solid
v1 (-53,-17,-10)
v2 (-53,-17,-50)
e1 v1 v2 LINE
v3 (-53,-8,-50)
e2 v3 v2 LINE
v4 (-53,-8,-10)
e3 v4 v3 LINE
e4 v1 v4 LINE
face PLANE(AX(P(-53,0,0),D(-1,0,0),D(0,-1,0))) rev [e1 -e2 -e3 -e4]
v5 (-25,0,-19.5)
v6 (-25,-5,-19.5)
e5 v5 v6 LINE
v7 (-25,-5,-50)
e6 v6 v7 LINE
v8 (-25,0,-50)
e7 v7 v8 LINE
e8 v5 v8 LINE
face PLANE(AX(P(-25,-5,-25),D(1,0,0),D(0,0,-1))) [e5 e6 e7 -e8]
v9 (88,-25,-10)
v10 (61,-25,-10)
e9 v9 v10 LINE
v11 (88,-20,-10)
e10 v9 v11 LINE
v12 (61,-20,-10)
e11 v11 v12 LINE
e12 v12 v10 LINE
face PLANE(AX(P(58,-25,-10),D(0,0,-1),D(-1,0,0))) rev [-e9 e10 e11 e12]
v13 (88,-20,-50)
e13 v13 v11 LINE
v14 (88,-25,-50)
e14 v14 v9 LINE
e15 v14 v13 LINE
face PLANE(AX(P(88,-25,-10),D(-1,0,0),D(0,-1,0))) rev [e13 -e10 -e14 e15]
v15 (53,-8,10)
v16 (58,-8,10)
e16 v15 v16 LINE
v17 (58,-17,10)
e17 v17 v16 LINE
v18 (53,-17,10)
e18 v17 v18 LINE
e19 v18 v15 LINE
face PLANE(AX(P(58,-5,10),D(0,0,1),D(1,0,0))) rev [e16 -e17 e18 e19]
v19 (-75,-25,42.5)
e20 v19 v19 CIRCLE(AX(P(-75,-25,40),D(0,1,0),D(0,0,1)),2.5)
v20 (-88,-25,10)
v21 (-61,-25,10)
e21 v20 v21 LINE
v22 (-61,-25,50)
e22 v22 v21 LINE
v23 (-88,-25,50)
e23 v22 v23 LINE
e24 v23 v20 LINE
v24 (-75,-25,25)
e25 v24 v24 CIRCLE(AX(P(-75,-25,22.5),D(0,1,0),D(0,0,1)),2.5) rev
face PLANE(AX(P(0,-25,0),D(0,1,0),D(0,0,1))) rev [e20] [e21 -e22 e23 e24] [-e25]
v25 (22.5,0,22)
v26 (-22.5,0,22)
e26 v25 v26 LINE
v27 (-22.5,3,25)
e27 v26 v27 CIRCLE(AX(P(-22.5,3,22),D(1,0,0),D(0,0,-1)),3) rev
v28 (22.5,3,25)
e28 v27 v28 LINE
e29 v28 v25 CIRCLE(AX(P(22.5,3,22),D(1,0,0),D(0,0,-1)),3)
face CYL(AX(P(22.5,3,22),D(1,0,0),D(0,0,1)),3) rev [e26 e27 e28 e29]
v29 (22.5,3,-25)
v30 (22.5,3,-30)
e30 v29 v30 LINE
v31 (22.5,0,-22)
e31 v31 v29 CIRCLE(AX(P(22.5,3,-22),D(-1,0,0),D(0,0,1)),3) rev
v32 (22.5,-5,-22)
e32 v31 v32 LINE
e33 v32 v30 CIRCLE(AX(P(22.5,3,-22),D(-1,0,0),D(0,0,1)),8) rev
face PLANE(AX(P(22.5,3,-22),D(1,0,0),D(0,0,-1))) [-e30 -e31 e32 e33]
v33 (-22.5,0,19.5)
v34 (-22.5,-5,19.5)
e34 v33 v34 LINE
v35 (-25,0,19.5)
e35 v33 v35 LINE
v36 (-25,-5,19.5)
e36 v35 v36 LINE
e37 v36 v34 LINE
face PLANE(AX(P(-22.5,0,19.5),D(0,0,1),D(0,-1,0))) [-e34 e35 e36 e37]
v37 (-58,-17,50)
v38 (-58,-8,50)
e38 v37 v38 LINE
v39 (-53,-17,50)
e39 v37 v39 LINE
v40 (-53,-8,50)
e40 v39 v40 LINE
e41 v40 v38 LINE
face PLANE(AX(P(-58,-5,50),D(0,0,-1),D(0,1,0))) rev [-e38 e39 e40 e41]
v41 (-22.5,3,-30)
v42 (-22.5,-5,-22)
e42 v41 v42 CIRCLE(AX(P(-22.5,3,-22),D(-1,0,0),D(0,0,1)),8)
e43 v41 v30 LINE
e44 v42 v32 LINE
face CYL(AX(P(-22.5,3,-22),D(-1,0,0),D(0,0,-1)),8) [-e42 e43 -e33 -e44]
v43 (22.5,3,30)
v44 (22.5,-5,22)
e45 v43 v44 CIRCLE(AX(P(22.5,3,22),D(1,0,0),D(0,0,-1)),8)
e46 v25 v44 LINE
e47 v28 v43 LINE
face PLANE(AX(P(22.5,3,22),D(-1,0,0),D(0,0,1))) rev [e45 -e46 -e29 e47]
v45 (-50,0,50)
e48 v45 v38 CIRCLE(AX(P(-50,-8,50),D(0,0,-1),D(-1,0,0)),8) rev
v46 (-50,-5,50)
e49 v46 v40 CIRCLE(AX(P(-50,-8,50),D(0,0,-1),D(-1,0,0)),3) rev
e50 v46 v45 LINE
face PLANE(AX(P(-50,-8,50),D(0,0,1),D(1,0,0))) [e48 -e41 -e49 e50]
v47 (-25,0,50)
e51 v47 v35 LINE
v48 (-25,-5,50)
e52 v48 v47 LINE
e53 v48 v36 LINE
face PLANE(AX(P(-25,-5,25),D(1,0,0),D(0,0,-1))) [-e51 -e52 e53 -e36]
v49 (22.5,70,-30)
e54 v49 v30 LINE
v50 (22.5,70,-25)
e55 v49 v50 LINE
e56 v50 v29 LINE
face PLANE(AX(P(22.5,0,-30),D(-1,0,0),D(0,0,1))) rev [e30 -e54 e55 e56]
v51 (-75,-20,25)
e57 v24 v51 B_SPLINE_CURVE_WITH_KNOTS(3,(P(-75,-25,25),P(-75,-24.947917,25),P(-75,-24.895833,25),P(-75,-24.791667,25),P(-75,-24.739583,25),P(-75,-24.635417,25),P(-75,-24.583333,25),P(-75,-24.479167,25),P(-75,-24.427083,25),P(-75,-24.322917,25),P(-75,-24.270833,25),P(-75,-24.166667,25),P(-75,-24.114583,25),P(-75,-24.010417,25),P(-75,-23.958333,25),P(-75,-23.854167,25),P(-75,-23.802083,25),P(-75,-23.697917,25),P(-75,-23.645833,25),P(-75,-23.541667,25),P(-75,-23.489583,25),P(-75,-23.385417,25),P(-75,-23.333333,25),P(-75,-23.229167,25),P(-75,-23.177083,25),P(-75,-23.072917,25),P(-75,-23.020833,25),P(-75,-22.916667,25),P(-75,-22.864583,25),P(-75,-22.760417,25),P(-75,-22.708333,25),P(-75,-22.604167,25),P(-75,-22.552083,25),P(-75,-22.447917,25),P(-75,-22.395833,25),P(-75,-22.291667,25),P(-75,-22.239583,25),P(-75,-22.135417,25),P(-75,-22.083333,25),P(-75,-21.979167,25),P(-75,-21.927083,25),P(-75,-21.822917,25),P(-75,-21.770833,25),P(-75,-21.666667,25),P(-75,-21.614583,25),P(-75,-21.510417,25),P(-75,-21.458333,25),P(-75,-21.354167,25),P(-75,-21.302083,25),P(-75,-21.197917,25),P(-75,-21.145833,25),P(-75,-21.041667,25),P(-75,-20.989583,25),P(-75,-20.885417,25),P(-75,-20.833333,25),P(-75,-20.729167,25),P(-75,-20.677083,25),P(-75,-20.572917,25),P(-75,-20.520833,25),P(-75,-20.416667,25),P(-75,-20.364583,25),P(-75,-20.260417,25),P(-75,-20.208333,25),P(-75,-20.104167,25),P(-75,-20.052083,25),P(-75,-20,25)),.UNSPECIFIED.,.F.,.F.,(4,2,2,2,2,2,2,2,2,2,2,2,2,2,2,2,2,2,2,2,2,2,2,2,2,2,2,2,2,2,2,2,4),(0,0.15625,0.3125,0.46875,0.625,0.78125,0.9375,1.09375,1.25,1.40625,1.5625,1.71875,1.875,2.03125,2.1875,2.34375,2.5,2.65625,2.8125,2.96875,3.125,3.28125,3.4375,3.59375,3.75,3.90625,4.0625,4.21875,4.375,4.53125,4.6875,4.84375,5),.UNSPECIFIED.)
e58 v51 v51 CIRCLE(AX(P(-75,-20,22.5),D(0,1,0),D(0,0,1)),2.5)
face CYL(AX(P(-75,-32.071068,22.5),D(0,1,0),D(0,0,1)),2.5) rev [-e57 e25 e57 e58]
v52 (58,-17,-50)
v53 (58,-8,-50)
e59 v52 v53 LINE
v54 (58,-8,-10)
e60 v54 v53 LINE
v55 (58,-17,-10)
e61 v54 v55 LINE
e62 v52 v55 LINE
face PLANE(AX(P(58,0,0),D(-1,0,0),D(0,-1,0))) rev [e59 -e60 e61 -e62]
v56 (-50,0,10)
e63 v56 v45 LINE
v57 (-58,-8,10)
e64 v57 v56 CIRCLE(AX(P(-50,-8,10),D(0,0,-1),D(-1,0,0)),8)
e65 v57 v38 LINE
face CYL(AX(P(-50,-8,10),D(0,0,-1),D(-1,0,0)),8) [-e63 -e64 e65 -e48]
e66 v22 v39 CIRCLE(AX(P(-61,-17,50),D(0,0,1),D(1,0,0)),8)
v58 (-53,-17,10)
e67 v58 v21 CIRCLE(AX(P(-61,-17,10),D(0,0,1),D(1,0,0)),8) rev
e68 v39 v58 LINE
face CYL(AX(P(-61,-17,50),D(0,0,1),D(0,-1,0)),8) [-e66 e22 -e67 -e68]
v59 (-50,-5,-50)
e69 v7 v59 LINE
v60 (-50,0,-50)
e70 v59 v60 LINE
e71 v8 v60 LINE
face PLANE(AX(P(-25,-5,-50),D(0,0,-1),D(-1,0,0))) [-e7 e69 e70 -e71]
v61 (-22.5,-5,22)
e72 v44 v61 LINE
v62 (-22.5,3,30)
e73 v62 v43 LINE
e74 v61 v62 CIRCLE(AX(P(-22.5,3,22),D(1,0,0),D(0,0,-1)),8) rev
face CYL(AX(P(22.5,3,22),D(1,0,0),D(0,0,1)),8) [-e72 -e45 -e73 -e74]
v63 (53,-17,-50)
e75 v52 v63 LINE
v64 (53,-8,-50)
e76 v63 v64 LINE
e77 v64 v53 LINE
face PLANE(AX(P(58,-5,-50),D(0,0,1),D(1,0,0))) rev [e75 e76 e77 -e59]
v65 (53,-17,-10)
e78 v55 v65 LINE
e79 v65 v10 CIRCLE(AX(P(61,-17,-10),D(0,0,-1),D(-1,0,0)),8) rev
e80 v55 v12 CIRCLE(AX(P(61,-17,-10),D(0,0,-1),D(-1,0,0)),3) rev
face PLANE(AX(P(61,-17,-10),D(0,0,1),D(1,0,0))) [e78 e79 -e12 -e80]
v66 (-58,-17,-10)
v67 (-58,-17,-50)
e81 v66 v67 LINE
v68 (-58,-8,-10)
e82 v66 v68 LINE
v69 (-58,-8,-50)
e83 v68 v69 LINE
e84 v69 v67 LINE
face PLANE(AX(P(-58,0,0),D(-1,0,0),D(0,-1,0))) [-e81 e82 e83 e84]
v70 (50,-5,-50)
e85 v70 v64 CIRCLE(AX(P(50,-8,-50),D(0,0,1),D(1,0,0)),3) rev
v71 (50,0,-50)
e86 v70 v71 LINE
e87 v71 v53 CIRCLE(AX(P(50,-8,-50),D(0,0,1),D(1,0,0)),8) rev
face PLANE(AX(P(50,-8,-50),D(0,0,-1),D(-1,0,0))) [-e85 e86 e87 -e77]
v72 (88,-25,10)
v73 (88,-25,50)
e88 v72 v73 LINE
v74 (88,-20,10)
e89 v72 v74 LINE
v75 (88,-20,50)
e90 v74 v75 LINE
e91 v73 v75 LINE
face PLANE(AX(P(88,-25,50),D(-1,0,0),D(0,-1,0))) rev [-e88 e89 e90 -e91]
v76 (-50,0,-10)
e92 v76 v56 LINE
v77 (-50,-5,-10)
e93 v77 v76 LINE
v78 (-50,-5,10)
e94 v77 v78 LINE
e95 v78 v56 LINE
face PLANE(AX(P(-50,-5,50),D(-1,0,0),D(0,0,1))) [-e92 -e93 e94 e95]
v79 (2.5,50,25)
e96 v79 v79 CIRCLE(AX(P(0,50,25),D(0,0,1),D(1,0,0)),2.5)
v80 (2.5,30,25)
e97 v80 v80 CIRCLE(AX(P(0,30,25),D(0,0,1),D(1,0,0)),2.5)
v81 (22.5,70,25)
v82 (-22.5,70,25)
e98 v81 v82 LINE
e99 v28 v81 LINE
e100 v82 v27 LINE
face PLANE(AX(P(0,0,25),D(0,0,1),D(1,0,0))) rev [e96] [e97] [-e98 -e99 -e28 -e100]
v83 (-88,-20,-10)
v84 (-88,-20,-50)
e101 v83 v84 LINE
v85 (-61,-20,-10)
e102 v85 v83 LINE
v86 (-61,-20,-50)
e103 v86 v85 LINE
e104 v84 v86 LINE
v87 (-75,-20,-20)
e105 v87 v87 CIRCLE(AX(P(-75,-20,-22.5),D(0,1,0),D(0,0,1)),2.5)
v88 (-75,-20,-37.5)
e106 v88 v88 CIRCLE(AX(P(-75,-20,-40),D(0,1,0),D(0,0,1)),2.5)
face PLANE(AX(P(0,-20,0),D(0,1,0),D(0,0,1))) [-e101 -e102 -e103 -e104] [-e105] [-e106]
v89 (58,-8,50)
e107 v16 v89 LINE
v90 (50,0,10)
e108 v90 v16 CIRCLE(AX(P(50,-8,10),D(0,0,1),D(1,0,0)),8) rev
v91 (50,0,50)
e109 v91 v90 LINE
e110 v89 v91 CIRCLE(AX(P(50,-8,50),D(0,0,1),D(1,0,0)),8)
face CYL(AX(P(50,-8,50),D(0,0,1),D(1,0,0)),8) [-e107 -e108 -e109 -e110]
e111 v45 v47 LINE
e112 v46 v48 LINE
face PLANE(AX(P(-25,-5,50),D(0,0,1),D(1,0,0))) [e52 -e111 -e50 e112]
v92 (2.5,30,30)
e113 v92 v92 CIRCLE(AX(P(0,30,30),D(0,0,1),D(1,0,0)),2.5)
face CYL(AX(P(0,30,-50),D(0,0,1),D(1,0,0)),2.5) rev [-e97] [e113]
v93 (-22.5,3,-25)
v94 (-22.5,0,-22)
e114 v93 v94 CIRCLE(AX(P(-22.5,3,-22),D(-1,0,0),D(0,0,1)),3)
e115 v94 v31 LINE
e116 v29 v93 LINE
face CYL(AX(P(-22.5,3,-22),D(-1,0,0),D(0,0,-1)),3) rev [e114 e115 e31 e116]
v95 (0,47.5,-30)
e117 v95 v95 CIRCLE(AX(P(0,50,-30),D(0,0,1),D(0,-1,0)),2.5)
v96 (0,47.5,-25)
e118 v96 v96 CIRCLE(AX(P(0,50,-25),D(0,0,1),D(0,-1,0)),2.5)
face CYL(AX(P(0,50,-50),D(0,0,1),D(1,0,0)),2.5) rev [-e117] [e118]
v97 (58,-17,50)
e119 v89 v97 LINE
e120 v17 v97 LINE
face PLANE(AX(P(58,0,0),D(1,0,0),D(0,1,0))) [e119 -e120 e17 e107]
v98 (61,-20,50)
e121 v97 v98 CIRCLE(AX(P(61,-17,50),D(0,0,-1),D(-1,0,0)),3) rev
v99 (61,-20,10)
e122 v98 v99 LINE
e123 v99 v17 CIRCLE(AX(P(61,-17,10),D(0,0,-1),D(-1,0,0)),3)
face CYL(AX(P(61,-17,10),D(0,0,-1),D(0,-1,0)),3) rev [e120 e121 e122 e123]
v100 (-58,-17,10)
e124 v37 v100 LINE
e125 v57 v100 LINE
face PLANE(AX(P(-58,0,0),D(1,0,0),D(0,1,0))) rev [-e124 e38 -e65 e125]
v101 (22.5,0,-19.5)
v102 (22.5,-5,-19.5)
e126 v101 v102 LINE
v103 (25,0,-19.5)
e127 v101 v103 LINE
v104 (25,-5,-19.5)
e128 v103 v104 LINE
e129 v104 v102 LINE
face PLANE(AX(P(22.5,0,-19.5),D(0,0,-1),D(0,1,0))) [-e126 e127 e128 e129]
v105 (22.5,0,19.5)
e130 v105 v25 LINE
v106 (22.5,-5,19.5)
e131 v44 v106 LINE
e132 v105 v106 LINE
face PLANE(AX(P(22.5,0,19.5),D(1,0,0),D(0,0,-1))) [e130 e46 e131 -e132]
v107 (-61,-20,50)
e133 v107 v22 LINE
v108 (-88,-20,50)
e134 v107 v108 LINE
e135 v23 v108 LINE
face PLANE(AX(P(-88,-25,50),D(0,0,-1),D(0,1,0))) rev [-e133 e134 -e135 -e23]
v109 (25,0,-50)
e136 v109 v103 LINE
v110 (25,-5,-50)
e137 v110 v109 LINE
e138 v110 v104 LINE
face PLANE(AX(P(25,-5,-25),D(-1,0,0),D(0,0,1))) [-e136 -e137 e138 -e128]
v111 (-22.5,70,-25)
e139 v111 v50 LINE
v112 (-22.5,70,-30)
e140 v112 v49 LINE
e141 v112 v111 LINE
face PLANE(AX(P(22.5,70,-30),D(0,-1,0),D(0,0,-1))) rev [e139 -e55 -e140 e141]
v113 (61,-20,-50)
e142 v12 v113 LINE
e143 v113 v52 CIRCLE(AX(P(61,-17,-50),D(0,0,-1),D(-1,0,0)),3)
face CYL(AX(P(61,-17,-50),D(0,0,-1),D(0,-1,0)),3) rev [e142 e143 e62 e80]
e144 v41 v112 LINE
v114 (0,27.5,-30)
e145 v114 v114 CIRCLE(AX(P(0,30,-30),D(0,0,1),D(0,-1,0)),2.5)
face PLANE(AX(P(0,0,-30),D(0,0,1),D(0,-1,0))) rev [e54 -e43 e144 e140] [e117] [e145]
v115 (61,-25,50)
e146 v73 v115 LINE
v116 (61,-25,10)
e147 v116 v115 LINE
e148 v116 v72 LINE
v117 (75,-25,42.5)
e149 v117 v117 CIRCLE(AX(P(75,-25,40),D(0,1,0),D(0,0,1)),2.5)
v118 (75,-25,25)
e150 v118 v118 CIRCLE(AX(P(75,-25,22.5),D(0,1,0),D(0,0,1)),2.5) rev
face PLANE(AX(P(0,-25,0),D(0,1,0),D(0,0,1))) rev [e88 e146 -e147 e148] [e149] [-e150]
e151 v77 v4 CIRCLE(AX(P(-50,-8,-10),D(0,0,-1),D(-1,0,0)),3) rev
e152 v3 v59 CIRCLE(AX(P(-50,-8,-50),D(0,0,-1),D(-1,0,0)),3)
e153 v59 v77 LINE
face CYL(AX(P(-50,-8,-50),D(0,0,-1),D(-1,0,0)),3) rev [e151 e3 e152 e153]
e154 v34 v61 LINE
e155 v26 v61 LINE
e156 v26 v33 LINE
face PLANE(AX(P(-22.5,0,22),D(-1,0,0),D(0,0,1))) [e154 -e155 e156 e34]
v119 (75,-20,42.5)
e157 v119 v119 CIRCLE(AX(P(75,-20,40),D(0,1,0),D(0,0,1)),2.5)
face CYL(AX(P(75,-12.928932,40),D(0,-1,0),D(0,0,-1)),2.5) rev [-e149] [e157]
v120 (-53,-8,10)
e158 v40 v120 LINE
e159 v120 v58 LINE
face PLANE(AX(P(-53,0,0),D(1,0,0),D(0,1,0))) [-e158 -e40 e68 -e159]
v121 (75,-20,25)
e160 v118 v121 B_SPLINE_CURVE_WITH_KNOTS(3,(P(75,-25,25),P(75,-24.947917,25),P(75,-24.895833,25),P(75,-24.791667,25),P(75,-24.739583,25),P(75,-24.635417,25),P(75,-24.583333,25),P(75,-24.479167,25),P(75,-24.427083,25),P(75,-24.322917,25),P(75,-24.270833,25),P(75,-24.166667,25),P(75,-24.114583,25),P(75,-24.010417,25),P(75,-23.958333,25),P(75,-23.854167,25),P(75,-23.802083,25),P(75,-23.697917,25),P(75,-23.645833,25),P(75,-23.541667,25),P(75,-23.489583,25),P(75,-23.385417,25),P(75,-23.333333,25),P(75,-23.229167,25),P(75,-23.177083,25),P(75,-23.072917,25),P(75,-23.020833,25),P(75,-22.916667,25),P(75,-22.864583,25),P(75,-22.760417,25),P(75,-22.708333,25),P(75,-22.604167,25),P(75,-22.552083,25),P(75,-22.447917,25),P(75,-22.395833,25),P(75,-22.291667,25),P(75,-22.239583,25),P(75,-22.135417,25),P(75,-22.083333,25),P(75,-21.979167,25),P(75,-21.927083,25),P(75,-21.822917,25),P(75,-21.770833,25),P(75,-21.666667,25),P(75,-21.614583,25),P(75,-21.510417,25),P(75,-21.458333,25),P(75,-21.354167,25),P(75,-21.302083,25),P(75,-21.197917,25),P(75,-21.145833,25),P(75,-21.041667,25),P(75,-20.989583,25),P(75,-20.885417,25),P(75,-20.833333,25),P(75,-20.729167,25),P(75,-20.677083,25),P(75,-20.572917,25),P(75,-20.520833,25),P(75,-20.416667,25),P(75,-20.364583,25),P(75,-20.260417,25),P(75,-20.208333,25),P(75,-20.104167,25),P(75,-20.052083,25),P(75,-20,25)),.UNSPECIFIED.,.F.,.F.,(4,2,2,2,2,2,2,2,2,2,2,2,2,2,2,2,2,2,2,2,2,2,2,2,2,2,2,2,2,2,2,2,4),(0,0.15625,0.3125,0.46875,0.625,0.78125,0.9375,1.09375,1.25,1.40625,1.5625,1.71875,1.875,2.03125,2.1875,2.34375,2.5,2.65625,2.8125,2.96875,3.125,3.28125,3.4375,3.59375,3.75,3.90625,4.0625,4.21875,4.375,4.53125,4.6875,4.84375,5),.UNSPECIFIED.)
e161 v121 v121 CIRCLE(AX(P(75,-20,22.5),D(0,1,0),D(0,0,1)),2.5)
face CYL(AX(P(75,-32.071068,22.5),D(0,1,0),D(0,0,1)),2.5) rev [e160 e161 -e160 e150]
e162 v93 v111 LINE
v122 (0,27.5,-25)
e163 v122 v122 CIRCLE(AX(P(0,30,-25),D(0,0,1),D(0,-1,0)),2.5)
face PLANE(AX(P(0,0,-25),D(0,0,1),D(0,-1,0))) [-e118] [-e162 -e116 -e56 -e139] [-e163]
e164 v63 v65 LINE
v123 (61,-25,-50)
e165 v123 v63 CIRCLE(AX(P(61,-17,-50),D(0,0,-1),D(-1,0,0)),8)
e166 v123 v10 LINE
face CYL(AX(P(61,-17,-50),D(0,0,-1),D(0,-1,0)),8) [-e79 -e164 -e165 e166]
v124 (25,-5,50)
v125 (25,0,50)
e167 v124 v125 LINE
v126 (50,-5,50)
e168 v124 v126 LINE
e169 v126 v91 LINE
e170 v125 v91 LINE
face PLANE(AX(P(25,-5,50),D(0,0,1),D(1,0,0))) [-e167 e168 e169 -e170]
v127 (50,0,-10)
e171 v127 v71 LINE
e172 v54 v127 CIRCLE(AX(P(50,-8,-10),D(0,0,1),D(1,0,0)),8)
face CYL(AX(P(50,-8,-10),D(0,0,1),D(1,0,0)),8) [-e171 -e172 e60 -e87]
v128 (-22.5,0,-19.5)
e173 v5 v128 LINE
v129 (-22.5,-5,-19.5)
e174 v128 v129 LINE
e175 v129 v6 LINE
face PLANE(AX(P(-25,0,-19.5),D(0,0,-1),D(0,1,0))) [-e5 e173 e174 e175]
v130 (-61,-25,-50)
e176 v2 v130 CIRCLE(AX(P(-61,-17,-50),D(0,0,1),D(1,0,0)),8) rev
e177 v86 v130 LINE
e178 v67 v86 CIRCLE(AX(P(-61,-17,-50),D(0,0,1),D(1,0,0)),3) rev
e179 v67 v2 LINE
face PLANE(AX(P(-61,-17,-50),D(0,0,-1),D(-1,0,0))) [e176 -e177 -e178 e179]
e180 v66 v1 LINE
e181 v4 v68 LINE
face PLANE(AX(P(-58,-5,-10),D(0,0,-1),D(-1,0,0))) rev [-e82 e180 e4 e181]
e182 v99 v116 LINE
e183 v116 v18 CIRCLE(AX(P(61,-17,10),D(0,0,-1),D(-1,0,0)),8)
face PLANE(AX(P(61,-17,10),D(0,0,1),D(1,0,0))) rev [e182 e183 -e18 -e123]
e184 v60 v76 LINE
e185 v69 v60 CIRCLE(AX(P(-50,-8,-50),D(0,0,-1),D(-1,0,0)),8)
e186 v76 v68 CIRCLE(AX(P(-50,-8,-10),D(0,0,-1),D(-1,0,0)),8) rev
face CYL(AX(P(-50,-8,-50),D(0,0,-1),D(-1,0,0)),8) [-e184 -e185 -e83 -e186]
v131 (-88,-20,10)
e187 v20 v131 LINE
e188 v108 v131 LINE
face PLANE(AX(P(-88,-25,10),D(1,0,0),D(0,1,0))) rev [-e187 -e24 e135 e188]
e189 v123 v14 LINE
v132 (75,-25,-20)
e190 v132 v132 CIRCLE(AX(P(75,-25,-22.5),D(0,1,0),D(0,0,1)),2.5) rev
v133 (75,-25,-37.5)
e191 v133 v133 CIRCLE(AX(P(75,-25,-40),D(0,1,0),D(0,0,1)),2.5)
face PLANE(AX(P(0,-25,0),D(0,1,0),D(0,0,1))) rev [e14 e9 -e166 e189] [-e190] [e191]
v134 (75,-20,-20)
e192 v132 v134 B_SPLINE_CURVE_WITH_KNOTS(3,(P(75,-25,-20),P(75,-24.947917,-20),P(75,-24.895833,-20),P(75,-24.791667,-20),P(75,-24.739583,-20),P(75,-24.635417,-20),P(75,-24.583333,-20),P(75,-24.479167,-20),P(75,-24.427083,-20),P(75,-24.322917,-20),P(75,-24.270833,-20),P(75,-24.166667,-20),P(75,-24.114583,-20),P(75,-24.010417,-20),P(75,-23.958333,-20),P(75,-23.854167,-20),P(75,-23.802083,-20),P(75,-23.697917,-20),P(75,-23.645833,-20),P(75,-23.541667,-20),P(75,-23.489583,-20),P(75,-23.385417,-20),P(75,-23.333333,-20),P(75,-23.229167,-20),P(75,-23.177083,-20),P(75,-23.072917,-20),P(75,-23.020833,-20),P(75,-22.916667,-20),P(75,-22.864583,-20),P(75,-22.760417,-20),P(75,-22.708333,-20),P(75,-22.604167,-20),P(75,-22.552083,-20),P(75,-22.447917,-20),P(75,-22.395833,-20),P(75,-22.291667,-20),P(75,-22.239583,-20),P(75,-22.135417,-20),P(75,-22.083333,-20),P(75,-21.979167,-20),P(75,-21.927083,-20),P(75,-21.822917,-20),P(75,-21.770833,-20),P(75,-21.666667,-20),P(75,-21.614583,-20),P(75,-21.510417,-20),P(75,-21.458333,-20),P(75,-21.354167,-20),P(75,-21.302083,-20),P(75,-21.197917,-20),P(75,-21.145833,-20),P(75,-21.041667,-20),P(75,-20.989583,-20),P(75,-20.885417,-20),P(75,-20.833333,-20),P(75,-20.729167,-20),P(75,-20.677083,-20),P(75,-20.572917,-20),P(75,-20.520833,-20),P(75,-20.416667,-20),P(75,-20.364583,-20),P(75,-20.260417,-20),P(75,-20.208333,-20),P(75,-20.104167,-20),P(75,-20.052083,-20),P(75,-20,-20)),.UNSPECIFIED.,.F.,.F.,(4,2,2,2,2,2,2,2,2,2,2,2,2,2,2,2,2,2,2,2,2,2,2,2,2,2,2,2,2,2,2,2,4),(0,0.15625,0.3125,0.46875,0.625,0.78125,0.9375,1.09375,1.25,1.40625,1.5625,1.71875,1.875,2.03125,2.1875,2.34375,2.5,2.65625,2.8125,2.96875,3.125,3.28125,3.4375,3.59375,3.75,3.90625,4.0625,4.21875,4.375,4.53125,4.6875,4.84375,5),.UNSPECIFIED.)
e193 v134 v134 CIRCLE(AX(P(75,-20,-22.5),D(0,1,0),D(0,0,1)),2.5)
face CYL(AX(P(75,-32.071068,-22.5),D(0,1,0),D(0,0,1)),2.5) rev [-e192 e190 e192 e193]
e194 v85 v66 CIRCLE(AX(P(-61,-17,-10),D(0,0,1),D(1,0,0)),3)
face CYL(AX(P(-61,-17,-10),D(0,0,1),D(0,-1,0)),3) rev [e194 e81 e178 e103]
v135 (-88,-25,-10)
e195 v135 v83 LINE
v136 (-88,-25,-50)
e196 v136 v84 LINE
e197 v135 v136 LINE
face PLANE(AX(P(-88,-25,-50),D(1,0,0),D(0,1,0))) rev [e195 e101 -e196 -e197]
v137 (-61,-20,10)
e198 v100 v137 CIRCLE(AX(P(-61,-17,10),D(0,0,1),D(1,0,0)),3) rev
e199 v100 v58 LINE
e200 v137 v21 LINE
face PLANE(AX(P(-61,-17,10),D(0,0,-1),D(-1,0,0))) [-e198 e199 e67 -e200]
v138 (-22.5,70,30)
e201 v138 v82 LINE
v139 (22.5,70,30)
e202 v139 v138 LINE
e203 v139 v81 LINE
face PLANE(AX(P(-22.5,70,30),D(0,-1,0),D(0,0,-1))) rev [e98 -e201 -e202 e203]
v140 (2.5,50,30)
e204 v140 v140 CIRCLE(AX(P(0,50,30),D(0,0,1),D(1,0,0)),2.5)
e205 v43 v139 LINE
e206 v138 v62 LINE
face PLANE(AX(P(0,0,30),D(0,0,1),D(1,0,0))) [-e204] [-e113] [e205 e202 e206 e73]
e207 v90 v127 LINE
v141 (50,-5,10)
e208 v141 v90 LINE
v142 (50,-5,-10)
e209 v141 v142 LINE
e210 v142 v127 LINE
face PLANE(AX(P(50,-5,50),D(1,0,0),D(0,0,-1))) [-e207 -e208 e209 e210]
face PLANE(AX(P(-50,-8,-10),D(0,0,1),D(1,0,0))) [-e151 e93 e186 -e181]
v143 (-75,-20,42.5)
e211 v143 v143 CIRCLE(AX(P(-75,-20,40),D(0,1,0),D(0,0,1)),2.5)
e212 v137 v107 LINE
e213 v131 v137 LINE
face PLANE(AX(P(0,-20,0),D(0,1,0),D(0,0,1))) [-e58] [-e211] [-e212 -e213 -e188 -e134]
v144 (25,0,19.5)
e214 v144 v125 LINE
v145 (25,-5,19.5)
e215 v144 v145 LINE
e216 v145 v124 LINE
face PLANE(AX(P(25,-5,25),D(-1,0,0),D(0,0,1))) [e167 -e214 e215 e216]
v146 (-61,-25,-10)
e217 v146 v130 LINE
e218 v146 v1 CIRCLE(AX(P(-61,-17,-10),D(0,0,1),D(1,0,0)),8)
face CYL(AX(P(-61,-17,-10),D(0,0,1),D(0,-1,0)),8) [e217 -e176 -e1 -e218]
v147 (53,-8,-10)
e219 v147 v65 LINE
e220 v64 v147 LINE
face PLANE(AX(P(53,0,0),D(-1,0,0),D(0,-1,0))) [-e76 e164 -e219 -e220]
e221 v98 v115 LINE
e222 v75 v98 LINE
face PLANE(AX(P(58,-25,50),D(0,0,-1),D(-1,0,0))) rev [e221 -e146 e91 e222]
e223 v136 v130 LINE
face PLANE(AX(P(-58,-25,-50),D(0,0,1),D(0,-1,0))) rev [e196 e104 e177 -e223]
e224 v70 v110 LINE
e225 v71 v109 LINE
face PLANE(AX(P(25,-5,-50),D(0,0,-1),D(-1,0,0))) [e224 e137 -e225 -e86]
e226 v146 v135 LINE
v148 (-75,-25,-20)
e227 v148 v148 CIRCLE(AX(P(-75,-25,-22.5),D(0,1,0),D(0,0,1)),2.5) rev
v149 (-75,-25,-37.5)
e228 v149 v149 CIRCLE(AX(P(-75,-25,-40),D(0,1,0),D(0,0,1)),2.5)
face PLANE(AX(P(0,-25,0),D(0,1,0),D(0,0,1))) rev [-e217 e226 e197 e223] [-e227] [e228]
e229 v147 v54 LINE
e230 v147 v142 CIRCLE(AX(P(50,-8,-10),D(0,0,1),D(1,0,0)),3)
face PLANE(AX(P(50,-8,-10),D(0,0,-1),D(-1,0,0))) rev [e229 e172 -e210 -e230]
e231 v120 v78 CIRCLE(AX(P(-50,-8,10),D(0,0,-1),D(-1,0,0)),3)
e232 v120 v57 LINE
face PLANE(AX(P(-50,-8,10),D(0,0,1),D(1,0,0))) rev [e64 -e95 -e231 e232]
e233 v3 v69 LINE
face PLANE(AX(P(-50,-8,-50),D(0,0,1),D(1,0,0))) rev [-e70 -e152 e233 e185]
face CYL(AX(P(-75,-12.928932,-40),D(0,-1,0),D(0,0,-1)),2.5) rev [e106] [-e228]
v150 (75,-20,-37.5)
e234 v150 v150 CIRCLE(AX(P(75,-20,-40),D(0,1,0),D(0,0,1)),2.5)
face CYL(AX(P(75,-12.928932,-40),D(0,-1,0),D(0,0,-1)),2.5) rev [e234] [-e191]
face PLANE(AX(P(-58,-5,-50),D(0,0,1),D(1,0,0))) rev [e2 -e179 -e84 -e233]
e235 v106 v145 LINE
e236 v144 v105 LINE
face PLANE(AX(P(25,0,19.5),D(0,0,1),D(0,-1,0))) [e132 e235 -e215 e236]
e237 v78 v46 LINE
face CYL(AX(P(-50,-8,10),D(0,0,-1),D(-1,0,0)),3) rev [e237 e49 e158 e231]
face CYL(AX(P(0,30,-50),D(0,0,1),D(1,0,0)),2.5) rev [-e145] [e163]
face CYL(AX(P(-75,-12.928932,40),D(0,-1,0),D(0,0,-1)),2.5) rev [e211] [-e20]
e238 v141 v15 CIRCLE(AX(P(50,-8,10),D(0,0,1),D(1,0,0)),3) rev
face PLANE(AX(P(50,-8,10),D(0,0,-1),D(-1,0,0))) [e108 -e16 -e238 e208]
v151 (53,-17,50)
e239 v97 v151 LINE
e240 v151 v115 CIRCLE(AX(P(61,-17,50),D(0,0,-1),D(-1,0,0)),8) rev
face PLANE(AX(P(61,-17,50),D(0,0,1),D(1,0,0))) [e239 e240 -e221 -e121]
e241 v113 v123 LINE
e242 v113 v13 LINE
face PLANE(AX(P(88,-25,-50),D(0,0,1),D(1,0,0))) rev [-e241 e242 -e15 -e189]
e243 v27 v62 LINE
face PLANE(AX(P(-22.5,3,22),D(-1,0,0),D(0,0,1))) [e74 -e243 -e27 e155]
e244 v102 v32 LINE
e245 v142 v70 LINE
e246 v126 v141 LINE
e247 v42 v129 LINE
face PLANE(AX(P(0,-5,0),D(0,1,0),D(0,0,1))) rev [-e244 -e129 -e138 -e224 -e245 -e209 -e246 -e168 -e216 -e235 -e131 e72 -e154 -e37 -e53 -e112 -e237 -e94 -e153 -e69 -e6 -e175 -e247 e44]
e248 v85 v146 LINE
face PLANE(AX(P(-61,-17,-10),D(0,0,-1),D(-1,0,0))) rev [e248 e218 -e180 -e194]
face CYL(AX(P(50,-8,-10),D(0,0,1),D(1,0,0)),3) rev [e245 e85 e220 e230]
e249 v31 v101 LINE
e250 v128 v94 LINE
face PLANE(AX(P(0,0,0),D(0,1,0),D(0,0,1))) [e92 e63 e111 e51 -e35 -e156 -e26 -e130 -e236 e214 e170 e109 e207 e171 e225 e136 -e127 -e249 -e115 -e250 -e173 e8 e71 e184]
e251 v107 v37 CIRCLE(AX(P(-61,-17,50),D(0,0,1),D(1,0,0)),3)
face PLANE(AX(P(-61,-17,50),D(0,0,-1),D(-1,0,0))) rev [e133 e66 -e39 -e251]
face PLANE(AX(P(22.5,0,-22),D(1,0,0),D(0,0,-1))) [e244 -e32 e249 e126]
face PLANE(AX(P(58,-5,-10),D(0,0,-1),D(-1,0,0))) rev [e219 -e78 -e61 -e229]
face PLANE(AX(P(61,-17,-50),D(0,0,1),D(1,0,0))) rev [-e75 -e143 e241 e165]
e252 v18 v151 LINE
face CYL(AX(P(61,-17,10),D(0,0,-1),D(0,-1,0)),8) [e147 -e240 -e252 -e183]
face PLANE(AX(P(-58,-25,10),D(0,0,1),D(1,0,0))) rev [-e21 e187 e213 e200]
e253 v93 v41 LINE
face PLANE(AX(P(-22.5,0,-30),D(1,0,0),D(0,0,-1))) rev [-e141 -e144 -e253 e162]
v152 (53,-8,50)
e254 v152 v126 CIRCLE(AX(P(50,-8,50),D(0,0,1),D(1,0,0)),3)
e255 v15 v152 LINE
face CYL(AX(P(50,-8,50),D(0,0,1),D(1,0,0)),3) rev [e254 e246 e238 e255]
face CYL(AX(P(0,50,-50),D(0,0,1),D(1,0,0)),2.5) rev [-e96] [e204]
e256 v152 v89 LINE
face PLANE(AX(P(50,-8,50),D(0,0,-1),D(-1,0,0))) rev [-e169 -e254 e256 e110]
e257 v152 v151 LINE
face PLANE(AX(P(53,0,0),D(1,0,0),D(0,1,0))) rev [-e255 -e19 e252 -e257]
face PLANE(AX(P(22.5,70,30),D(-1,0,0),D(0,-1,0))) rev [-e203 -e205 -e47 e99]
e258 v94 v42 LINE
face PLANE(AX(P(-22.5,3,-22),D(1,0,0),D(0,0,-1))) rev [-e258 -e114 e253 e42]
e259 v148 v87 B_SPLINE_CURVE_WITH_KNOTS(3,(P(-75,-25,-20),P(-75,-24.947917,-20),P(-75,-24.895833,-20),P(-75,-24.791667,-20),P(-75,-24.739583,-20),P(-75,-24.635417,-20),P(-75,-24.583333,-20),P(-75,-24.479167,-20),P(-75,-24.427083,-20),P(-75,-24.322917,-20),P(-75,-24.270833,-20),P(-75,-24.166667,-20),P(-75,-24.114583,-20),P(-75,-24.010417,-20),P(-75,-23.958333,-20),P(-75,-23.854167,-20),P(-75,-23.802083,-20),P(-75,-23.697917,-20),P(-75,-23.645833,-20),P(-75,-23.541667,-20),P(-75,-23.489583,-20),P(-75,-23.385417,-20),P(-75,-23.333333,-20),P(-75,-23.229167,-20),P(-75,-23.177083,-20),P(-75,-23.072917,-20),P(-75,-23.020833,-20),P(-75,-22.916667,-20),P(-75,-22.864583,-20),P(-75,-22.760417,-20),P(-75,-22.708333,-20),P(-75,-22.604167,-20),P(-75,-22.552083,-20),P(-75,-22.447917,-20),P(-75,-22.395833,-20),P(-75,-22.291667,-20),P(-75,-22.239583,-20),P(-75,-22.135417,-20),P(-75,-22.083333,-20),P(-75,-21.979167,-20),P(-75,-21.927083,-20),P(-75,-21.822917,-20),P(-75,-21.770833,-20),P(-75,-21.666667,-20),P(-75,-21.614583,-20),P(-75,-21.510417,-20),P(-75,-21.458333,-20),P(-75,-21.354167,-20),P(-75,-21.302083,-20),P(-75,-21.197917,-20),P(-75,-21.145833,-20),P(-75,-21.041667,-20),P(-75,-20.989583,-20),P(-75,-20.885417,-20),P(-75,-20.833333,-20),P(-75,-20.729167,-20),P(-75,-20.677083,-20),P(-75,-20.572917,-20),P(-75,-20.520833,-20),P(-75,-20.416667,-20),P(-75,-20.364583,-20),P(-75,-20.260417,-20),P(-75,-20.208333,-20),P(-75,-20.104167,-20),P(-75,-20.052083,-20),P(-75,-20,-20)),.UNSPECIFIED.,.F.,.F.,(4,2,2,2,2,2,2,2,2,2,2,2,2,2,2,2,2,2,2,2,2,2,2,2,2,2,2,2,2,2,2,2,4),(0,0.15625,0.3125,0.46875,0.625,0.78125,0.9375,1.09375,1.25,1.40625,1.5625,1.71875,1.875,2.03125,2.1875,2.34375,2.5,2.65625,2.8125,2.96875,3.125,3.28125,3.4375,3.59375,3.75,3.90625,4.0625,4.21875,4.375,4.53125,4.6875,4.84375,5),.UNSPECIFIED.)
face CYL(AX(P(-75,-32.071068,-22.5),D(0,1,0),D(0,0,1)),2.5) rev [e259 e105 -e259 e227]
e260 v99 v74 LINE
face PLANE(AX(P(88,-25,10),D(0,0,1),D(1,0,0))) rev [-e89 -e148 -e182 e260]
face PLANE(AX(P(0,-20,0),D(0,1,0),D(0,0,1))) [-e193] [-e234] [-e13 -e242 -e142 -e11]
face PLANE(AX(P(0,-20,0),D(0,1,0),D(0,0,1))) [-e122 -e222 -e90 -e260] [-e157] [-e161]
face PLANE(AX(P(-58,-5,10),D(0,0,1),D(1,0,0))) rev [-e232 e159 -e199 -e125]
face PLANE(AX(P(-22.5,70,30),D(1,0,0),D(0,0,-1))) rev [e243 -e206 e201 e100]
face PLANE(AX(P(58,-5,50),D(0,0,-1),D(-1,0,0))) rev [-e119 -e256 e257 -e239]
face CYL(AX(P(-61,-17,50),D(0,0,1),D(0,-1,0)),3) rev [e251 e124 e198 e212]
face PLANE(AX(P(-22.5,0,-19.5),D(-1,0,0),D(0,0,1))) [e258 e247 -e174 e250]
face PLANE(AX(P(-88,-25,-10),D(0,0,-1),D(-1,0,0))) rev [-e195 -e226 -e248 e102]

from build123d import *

# Parameters (mm, degrees)
SM_BASE_FLANGE_1_DEPTH            = 5
SM_EDGE_FLANGE_1_STRIP_W          = 26
SM_EDGE_FLANGE_1_STRIP_H          = 5
SM_EDGE_FLANGE_1_STRIP_CUT_DEPTH  = 45
SM_EDGE_FLANGE_1_RELIEF_W         = 28.5
SM_EDGE_FLANGE_1_RELIEF_H         = 2.5
SM_EDGE_FLANGE_1_RELIEF_CUT_DEPTH = 5
SM_EDGE_FLANGE_1_DEPTH            = 45
SM_EDGE_FLANGE_2_STRIP_W          = 26
SM_EDGE_FLANGE_2_STRIP_H          = 5
SM_EDGE_FLANGE_2_STRIP_CUT_DEPTH  = 45
SM_EDGE_FLANGE_2_RELIEF_W         = 28.5
SM_EDGE_FLANGE_2_RELIEF_H         = 2.5
SM_EDGE_FLANGE_2_RELIEF_CUT_DEPTH = 5
SM_EDGE_FLANGE_2_DEPTH            = 45
SM_EDGE_FLANGE_14_DEPTH           = 40
SM_EDGE_FLANGE_15_DEPTH           = 40
SM_EDGE_FLANGE_16_DEPTH           = 40
SM_EDGE_FLANGE_17_DEPTH           = 40
SM_EDGE_FLANGE_18_STRIP_W         = 26
SM_EDGE_FLANGE_18_STRIP_H         = 5
SM_EDGE_FLANGE_18_STRIP_CUT_DEPTH = 40
SM_EDGE_FLANGE_18_DEPTH           = 40
SM_EDGE_FLANGE_19_STRIP_W         = 26
SM_EDGE_FLANGE_19_STRIP_H         = 5
SM_EDGE_FLANGE_19_STRIP_CUT_DEPTH = 40
SM_EDGE_FLANGE_19_DEPTH           = 40
SM_EDGE_FLANGE_20_STRIP_W         = 26
SM_EDGE_FLANGE_20_STRIP_H         = 5
SM_EDGE_FLANGE_20_STRIP_CUT_DEPTH = 40
SM_EDGE_FLANGE_20_DEPTH           = 40
SM_EDGE_FLANGE_21_STRIP_W         = 26
SM_EDGE_FLANGE_21_STRIP_H         = 5
SM_EDGE_FLANGE_21_STRIP_CUT_DEPTH = 40
SM_EDGE_FLANGE_21_DEPTH           = 40
CUT_EXTRUDE_START                 = -25
SKETCH_80_R                       = 2.5
CUT_EXTRUDE_1_DEPTH               = 5
CUT_EXTRUDE_3_DEPTH               = 124.060960503
CUT_EXTRUDE_3_DEPTH_BACK          = 124.060960503
SKETCH_83_R                       = 2.5
CUT_EXTRUDE_START_2               = -20
SKETCH_84_R                       = 2.5
CUT_EXTRUDE_5_DEPTH               = 5


# Sheet-metal steps are written as plain solids
with BuildPart() as part:
    # Sketch 1 → 基体-法兰1 (new body)
    with BuildSketch(Plane(origin=(0, 0, 0), x_dir=(1, 0, 0), z_dir=(0, 1, 0))):
        Polygon((-25, -25), (-25, -50), (-50, -50), (-50, 50), (-25, 50), (-25, 25), (25, 25), (25, 50), (50, 50), (50, -50), (25, -50), (25, -25), align=None)
    extrude(amount=-SM_BASE_FLANGE_1_DEPTH)

    # 边线-法兰1 strip (across the edge) → 边线-法兰1 strip cut (cut)
    with BuildSketch(Plane(origin=(22.5, 0, -25), x_dir=(0, 0, 1), z_dir=(-1, 0, 0))):
        with Locations((-10, -2.5)):
            Rectangle(SM_EDGE_FLANGE_1_STRIP_W, SM_EDGE_FLANGE_1_STRIP_H)
    extrude(amount=SM_EDGE_FLANGE_1_STRIP_CUT_DEPTH, mode=Mode.SUBTRACT)

    # 边线-法兰1 relief (on the sheet) → 边线-法兰1 relief cut (cut)
    with BuildSketch(Plane(origin=(22.5, 0, -22), x_dir=(0, 0, 1), z_dir=(0, 1, 0))):
        with Locations((-11.75, 1.25)):
            Rectangle(SM_EDGE_FLANGE_1_RELIEF_W, SM_EDGE_FLANGE_1_RELIEF_H)
        with Locations((-11.75, -46.25)):
            Rectangle(SM_EDGE_FLANGE_1_RELIEF_W, SM_EDGE_FLANGE_1_RELIEF_H)
    extrude(amount=-SM_EDGE_FLANGE_1_RELIEF_CUT_DEPTH, mode=Mode.SUBTRACT)

    # 边线-法兰1 section (across the edge) → 边线-法兰1 (add)
    with BuildSketch(Plane(origin=(22.5, 0, -25), x_dir=(0, 0, 1), z_dir=(-1, 0, 0))):
        with BuildLine():
            Line((-5, 3), (-5, 70))
            Line((-5, 70), (0, 70))
            Line((0, 70), (0, 3))
            ThreePointArc((0, 3), (0.878679656, 0.878679656), (3, 0))
            Line((3, 0), (3, -5))
            ThreePointArc((3, -5), (-2.656854249, -2.656854249), (-5, 3))
        make_face()
    extrude(amount=SM_EDGE_FLANGE_1_DEPTH)

    # 边线-法兰2 strip (across the edge) → 边线-法兰2 strip cut (cut)
    with BuildSketch(Plane(origin=(-22.5, 0, 25), x_dir=(0, 0, -1), z_dir=(1, 0, 0))):
        with Locations((-10, -2.5)):
            Rectangle(SM_EDGE_FLANGE_2_STRIP_W, SM_EDGE_FLANGE_2_STRIP_H)
    extrude(amount=SM_EDGE_FLANGE_2_STRIP_CUT_DEPTH, mode=Mode.SUBTRACT)

    # 边线-法兰2 relief (on the sheet) → 边线-法兰2 relief cut (cut)
    with BuildSketch(Plane(origin=(-22.5, 0, 22), x_dir=(0, 0, -1), z_dir=(0, 1, 0))):
        with Locations((-11.75, 1.25)):
            Rectangle(SM_EDGE_FLANGE_2_RELIEF_W, SM_EDGE_FLANGE_2_RELIEF_H)
        with Locations((-11.75, -46.25)):
            Rectangle(SM_EDGE_FLANGE_2_RELIEF_W, SM_EDGE_FLANGE_2_RELIEF_H)
    extrude(amount=-SM_EDGE_FLANGE_2_RELIEF_CUT_DEPTH, mode=Mode.SUBTRACT)

    # 边线-法兰2 section (across the edge) → 边线-法兰2 (add)
    with BuildSketch(Plane(origin=(-22.5, 0, 25), x_dir=(0, 0, -1), z_dir=(1, 0, 0))):
        with BuildLine():
            Line((-5, 3), (-5, 70))
            Line((-5, 70), (0, 70))
            Line((0, 70), (0, 3))
            ThreePointArc((0, 3), (0.878679656, 0.878679656), (3, 0))
            Line((3, 0), (3, -5))
            ThreePointArc((3, -5), (-2.656854249, -2.656854249), (-5, 3))
        make_face()
    extrude(amount=SM_EDGE_FLANGE_2_DEPTH)

    # 边线-法兰14 section (across the edge) → 边线-法兰14 (add)
    with BuildSketch(Plane(origin=(53, -5, 10), x_dir=(-1, 0, 0), z_dir=(0, 0, 1))):
        with BuildLine():
            Line((-5, 3), (-5, 20))
            Line((-5, 20), (0, 20))
            Line((0, 20), (0, 3))
            ThreePointArc((0, 3), (0.878679656, 0.878679656), (3, 0))
            Line((3, 0), (3, -5))
            ThreePointArc((3, -5), (-2.656854249, -2.656854249), (-5, 3))
        make_face()
    extrude(amount=SM_EDGE_FLANGE_14_DEPTH)

    # 边线-法兰15 section (across the edge) → 边线-法兰15 (add)
    with BuildSketch(Plane(origin=(53, -5, -50), x_dir=(-1, 0, 0), z_dir=(0, 0, 1))):
        with BuildLine():
            Line((-5, 3), (-5, 20))
            Line((-5, 20), (0, 20))
            Line((0, 20), (0, 3))
            ThreePointArc((0, 3), (0.878679656, 0.878679656), (3, 0))
            Line((3, 0), (3, -5))
            ThreePointArc((3, -5), (-2.656854249, -2.656854249), (-5, 3))
        make_face()
    extrude(amount=SM_EDGE_FLANGE_15_DEPTH)

    # 边线-法兰16 section (across the edge) → 边线-法兰16 (add)
    with BuildSketch(Plane(origin=(-53, -5, -10), x_dir=(1, 0, 0), z_dir=(0, 0, -1))):
        with BuildLine():
            Line((-5, 3), (-5, 20))
            Line((-5, 20), (0, 20))
            Line((0, 20), (0, 3))
            ThreePointArc((0, 3), (0.878679656, 0.878679656), (3, 0))
            Line((3, 0), (3, -5))
            ThreePointArc((3, -5), (-2.656854249, -2.656854249), (-5, 3))
        make_face()
    extrude(amount=SM_EDGE_FLANGE_16_DEPTH)

    # 边线-法兰17 section (across the edge) → 边线-法兰17 (add)
    with BuildSketch(Plane(origin=(-53, -5, 50), x_dir=(1, 0, 0), z_dir=(0, 0, -1))):
        with BuildLine():
            Line((-5, 3), (-5, 20))
            Line((-5, 20), (0, 20))
            Line((0, 20), (0, 3))
            ThreePointArc((0, 3), (0.878679656, 0.878679656), (3, 0))
            Line((3, 0), (3, -5))
            ThreePointArc((3, -5), (-2.656854249, -2.656854249), (-5, 3))
        make_face()
    extrude(amount=SM_EDGE_FLANGE_17_DEPTH)

    # 边线-法兰18 strip (across the edge) → 边线-法兰18 strip cut (cut)
    with BuildSketch(Plane(origin=(-58, -25, -50), x_dir=(0, 1, 0), z_dir=(0, 0, 1))):
        with Locations((-5, -2.5)):
            Rectangle(SM_EDGE_FLANGE_18_STRIP_W, SM_EDGE_FLANGE_18_STRIP_H)
    extrude(amount=SM_EDGE_FLANGE_18_STRIP_CUT_DEPTH, mode=Mode.SUBTRACT)

    # 边线-法兰18 section (across the edge) → 边线-法兰18 (add)
    with BuildSketch(Plane(origin=(-58, -25, -50), x_dir=(0, 1, 0), z_dir=(0, 0, 1))):
        with BuildLine():
            Line((0, 3), (0, 30))
            Line((0, 30), (5, 30))
            Line((5, 30), (5, 3))
            ThreePointArc((5, 3), (5.878679656, 0.878679656), (8, 0))
            Line((8, 0), (8, -5))
            ThreePointArc((8, -5), (2.343145751, -2.656854249), (0, 3))
        make_face()
    extrude(amount=SM_EDGE_FLANGE_18_DEPTH)

    # 边线-法兰19 strip (across the edge) → 边线-法兰19 strip cut (cut)
    with BuildSketch(Plane(origin=(-58, -25, 10), x_dir=(0, 1, 0), z_dir=(0, 0, 1))):
        with Locations((-5, -2.5)):
            Rectangle(SM_EDGE_FLANGE_19_STRIP_W, SM_EDGE_FLANGE_19_STRIP_H)
    extrude(amount=SM_EDGE_FLANGE_19_STRIP_CUT_DEPTH, mode=Mode.SUBTRACT)

    # 边线-法兰19 section (across the edge) → 边线-法兰19 (add)
    with BuildSketch(Plane(origin=(-58, -25, 10), x_dir=(0, 1, 0), z_dir=(0, 0, 1))):
        with BuildLine():
            Line((0, 3), (0, 30))
            Line((0, 30), (5, 30))
            Line((5, 30), (5, 3))
            ThreePointArc((5, 3), (5.878679656, 0.878679656), (8, 0))
            Line((8, 0), (8, -5))
            ThreePointArc((8, -5), (2.343145751, -2.656854249), (0, 3))
        make_face()
    extrude(amount=SM_EDGE_FLANGE_19_DEPTH)

    # 边线-法兰20 strip (across the edge) → 边线-法兰20 strip cut (cut)
    with BuildSketch(Plane(origin=(58, -25, 50), x_dir=(0, 1, 0), z_dir=(0, 0, -1))):
        with Locations((-5, -2.5)):
            Rectangle(SM_EDGE_FLANGE_20_STRIP_W, SM_EDGE_FLANGE_20_STRIP_H)
    extrude(amount=SM_EDGE_FLANGE_20_STRIP_CUT_DEPTH, mode=Mode.SUBTRACT)

    # 边线-法兰20 section (across the edge) → 边线-法兰20 (add)
    with BuildSketch(Plane(origin=(58, -25, 50), x_dir=(0, 1, 0), z_dir=(0, 0, -1))):
        with BuildLine():
            Line((0, 3), (0, 30))
            Line((0, 30), (5, 30))
            Line((5, 30), (5, 3))
            ThreePointArc((5, 3), (5.878679656, 0.878679656), (8, 0))
            Line((8, 0), (8, -5))
            ThreePointArc((8, -5), (2.343145751, -2.656854249), (0, 3))
        make_face()
    extrude(amount=SM_EDGE_FLANGE_20_DEPTH)

    # 边线-法兰21 strip (across the edge) → 边线-法兰21 strip cut (cut)
    with BuildSketch(Plane(origin=(58, -25, -10), x_dir=(0, 1, 0), z_dir=(0, 0, -1))):
        with Locations((-5, -2.5)):
            Rectangle(SM_EDGE_FLANGE_21_STRIP_W, SM_EDGE_FLANGE_21_STRIP_H)
    extrude(amount=SM_EDGE_FLANGE_21_STRIP_CUT_DEPTH, mode=Mode.SUBTRACT)

    # 边线-法兰21 section (across the edge) → 边线-法兰21 (add)
    with BuildSketch(Plane(origin=(58, -25, -10), x_dir=(0, 1, 0), z_dir=(0, 0, -1))):
        with BuildLine():
            Line((0, 3), (0, 30))
            Line((0, 30), (5, 30))
            Line((5, 30), (5, 3))
            ThreePointArc((5, 3), (5.878679656, 0.878679656), (8, 0))
            Line((8, 0), (8, -5))
            ThreePointArc((8, -5), (2.343145751, -2.656854249), (0, 3))
        make_face()
    extrude(amount=SM_EDGE_FLANGE_21_DEPTH)

    # 草图80 → 切除-拉伸1 (cut)
    with BuildSketch(Plane(origin=(0, 0, 0), x_dir=(1, 0, 0), z_dir=(0, 1, 0)).offset(CUT_EXTRUDE_START)):
        with Locations(Location((-75, 40, 0), (0, 0, 270))):
            Circle(SKETCH_80_R)
        with Locations(Location((75, 40, 0), (0, 0, 270))):
            Circle(SKETCH_80_R)
        with Locations(Location((-75, -40, 0), (0, 0, 270))):
            Circle(SKETCH_80_R)
        with Locations(Location((75, -40, 0), (0, 0, 270))):
            Circle(SKETCH_80_R)
    extrude(amount=CUT_EXTRUDE_1_DEPTH, mode=Mode.SUBTRACT)

    # 草图83 → 切除-拉伸3 (cut, two sides: drawn at the far end of the back side and taken through both)
    with BuildSketch(Plane.XY.offset(-CUT_EXTRUDE_3_DEPTH_BACK)):
        with Locations((0, 50)):
            Circle(SKETCH_83_R)
        with Locations((0, 30)):
            Circle(SKETCH_83_R)
    extrude(amount=CUT_EXTRUDE_3_DEPTH + CUT_EXTRUDE_3_DEPTH_BACK, mode=Mode.SUBTRACT)

    # 草图84 → 切除-拉伸5 (cut)
    with BuildSketch(Plane(origin=(0, 0, 0), x_dir=(1, 0, 0), z_dir=(0, 1, 0)).offset(CUT_EXTRUDE_START_2)):
        with Locations(Location((75, 22.5, 0), (0, 0, 270))):
            Circle(SKETCH_84_R)
        with Locations(Location((75, -22.5, 0), (0, 0, 270))):
            Circle(SKETCH_84_R)
        with Locations(Location((-75, -22.5, 0), (0, 0, 270))):
            Circle(SKETCH_84_R)
        with Locations(Location((-75, 22.5, 0), (0, 0, 270))):
            Circle(SKETCH_84_R)
    extrude(amount=-CUT_EXTRUDE_5_DEPTH, mode=Mode.SUBTRACT)


solid = part.part
